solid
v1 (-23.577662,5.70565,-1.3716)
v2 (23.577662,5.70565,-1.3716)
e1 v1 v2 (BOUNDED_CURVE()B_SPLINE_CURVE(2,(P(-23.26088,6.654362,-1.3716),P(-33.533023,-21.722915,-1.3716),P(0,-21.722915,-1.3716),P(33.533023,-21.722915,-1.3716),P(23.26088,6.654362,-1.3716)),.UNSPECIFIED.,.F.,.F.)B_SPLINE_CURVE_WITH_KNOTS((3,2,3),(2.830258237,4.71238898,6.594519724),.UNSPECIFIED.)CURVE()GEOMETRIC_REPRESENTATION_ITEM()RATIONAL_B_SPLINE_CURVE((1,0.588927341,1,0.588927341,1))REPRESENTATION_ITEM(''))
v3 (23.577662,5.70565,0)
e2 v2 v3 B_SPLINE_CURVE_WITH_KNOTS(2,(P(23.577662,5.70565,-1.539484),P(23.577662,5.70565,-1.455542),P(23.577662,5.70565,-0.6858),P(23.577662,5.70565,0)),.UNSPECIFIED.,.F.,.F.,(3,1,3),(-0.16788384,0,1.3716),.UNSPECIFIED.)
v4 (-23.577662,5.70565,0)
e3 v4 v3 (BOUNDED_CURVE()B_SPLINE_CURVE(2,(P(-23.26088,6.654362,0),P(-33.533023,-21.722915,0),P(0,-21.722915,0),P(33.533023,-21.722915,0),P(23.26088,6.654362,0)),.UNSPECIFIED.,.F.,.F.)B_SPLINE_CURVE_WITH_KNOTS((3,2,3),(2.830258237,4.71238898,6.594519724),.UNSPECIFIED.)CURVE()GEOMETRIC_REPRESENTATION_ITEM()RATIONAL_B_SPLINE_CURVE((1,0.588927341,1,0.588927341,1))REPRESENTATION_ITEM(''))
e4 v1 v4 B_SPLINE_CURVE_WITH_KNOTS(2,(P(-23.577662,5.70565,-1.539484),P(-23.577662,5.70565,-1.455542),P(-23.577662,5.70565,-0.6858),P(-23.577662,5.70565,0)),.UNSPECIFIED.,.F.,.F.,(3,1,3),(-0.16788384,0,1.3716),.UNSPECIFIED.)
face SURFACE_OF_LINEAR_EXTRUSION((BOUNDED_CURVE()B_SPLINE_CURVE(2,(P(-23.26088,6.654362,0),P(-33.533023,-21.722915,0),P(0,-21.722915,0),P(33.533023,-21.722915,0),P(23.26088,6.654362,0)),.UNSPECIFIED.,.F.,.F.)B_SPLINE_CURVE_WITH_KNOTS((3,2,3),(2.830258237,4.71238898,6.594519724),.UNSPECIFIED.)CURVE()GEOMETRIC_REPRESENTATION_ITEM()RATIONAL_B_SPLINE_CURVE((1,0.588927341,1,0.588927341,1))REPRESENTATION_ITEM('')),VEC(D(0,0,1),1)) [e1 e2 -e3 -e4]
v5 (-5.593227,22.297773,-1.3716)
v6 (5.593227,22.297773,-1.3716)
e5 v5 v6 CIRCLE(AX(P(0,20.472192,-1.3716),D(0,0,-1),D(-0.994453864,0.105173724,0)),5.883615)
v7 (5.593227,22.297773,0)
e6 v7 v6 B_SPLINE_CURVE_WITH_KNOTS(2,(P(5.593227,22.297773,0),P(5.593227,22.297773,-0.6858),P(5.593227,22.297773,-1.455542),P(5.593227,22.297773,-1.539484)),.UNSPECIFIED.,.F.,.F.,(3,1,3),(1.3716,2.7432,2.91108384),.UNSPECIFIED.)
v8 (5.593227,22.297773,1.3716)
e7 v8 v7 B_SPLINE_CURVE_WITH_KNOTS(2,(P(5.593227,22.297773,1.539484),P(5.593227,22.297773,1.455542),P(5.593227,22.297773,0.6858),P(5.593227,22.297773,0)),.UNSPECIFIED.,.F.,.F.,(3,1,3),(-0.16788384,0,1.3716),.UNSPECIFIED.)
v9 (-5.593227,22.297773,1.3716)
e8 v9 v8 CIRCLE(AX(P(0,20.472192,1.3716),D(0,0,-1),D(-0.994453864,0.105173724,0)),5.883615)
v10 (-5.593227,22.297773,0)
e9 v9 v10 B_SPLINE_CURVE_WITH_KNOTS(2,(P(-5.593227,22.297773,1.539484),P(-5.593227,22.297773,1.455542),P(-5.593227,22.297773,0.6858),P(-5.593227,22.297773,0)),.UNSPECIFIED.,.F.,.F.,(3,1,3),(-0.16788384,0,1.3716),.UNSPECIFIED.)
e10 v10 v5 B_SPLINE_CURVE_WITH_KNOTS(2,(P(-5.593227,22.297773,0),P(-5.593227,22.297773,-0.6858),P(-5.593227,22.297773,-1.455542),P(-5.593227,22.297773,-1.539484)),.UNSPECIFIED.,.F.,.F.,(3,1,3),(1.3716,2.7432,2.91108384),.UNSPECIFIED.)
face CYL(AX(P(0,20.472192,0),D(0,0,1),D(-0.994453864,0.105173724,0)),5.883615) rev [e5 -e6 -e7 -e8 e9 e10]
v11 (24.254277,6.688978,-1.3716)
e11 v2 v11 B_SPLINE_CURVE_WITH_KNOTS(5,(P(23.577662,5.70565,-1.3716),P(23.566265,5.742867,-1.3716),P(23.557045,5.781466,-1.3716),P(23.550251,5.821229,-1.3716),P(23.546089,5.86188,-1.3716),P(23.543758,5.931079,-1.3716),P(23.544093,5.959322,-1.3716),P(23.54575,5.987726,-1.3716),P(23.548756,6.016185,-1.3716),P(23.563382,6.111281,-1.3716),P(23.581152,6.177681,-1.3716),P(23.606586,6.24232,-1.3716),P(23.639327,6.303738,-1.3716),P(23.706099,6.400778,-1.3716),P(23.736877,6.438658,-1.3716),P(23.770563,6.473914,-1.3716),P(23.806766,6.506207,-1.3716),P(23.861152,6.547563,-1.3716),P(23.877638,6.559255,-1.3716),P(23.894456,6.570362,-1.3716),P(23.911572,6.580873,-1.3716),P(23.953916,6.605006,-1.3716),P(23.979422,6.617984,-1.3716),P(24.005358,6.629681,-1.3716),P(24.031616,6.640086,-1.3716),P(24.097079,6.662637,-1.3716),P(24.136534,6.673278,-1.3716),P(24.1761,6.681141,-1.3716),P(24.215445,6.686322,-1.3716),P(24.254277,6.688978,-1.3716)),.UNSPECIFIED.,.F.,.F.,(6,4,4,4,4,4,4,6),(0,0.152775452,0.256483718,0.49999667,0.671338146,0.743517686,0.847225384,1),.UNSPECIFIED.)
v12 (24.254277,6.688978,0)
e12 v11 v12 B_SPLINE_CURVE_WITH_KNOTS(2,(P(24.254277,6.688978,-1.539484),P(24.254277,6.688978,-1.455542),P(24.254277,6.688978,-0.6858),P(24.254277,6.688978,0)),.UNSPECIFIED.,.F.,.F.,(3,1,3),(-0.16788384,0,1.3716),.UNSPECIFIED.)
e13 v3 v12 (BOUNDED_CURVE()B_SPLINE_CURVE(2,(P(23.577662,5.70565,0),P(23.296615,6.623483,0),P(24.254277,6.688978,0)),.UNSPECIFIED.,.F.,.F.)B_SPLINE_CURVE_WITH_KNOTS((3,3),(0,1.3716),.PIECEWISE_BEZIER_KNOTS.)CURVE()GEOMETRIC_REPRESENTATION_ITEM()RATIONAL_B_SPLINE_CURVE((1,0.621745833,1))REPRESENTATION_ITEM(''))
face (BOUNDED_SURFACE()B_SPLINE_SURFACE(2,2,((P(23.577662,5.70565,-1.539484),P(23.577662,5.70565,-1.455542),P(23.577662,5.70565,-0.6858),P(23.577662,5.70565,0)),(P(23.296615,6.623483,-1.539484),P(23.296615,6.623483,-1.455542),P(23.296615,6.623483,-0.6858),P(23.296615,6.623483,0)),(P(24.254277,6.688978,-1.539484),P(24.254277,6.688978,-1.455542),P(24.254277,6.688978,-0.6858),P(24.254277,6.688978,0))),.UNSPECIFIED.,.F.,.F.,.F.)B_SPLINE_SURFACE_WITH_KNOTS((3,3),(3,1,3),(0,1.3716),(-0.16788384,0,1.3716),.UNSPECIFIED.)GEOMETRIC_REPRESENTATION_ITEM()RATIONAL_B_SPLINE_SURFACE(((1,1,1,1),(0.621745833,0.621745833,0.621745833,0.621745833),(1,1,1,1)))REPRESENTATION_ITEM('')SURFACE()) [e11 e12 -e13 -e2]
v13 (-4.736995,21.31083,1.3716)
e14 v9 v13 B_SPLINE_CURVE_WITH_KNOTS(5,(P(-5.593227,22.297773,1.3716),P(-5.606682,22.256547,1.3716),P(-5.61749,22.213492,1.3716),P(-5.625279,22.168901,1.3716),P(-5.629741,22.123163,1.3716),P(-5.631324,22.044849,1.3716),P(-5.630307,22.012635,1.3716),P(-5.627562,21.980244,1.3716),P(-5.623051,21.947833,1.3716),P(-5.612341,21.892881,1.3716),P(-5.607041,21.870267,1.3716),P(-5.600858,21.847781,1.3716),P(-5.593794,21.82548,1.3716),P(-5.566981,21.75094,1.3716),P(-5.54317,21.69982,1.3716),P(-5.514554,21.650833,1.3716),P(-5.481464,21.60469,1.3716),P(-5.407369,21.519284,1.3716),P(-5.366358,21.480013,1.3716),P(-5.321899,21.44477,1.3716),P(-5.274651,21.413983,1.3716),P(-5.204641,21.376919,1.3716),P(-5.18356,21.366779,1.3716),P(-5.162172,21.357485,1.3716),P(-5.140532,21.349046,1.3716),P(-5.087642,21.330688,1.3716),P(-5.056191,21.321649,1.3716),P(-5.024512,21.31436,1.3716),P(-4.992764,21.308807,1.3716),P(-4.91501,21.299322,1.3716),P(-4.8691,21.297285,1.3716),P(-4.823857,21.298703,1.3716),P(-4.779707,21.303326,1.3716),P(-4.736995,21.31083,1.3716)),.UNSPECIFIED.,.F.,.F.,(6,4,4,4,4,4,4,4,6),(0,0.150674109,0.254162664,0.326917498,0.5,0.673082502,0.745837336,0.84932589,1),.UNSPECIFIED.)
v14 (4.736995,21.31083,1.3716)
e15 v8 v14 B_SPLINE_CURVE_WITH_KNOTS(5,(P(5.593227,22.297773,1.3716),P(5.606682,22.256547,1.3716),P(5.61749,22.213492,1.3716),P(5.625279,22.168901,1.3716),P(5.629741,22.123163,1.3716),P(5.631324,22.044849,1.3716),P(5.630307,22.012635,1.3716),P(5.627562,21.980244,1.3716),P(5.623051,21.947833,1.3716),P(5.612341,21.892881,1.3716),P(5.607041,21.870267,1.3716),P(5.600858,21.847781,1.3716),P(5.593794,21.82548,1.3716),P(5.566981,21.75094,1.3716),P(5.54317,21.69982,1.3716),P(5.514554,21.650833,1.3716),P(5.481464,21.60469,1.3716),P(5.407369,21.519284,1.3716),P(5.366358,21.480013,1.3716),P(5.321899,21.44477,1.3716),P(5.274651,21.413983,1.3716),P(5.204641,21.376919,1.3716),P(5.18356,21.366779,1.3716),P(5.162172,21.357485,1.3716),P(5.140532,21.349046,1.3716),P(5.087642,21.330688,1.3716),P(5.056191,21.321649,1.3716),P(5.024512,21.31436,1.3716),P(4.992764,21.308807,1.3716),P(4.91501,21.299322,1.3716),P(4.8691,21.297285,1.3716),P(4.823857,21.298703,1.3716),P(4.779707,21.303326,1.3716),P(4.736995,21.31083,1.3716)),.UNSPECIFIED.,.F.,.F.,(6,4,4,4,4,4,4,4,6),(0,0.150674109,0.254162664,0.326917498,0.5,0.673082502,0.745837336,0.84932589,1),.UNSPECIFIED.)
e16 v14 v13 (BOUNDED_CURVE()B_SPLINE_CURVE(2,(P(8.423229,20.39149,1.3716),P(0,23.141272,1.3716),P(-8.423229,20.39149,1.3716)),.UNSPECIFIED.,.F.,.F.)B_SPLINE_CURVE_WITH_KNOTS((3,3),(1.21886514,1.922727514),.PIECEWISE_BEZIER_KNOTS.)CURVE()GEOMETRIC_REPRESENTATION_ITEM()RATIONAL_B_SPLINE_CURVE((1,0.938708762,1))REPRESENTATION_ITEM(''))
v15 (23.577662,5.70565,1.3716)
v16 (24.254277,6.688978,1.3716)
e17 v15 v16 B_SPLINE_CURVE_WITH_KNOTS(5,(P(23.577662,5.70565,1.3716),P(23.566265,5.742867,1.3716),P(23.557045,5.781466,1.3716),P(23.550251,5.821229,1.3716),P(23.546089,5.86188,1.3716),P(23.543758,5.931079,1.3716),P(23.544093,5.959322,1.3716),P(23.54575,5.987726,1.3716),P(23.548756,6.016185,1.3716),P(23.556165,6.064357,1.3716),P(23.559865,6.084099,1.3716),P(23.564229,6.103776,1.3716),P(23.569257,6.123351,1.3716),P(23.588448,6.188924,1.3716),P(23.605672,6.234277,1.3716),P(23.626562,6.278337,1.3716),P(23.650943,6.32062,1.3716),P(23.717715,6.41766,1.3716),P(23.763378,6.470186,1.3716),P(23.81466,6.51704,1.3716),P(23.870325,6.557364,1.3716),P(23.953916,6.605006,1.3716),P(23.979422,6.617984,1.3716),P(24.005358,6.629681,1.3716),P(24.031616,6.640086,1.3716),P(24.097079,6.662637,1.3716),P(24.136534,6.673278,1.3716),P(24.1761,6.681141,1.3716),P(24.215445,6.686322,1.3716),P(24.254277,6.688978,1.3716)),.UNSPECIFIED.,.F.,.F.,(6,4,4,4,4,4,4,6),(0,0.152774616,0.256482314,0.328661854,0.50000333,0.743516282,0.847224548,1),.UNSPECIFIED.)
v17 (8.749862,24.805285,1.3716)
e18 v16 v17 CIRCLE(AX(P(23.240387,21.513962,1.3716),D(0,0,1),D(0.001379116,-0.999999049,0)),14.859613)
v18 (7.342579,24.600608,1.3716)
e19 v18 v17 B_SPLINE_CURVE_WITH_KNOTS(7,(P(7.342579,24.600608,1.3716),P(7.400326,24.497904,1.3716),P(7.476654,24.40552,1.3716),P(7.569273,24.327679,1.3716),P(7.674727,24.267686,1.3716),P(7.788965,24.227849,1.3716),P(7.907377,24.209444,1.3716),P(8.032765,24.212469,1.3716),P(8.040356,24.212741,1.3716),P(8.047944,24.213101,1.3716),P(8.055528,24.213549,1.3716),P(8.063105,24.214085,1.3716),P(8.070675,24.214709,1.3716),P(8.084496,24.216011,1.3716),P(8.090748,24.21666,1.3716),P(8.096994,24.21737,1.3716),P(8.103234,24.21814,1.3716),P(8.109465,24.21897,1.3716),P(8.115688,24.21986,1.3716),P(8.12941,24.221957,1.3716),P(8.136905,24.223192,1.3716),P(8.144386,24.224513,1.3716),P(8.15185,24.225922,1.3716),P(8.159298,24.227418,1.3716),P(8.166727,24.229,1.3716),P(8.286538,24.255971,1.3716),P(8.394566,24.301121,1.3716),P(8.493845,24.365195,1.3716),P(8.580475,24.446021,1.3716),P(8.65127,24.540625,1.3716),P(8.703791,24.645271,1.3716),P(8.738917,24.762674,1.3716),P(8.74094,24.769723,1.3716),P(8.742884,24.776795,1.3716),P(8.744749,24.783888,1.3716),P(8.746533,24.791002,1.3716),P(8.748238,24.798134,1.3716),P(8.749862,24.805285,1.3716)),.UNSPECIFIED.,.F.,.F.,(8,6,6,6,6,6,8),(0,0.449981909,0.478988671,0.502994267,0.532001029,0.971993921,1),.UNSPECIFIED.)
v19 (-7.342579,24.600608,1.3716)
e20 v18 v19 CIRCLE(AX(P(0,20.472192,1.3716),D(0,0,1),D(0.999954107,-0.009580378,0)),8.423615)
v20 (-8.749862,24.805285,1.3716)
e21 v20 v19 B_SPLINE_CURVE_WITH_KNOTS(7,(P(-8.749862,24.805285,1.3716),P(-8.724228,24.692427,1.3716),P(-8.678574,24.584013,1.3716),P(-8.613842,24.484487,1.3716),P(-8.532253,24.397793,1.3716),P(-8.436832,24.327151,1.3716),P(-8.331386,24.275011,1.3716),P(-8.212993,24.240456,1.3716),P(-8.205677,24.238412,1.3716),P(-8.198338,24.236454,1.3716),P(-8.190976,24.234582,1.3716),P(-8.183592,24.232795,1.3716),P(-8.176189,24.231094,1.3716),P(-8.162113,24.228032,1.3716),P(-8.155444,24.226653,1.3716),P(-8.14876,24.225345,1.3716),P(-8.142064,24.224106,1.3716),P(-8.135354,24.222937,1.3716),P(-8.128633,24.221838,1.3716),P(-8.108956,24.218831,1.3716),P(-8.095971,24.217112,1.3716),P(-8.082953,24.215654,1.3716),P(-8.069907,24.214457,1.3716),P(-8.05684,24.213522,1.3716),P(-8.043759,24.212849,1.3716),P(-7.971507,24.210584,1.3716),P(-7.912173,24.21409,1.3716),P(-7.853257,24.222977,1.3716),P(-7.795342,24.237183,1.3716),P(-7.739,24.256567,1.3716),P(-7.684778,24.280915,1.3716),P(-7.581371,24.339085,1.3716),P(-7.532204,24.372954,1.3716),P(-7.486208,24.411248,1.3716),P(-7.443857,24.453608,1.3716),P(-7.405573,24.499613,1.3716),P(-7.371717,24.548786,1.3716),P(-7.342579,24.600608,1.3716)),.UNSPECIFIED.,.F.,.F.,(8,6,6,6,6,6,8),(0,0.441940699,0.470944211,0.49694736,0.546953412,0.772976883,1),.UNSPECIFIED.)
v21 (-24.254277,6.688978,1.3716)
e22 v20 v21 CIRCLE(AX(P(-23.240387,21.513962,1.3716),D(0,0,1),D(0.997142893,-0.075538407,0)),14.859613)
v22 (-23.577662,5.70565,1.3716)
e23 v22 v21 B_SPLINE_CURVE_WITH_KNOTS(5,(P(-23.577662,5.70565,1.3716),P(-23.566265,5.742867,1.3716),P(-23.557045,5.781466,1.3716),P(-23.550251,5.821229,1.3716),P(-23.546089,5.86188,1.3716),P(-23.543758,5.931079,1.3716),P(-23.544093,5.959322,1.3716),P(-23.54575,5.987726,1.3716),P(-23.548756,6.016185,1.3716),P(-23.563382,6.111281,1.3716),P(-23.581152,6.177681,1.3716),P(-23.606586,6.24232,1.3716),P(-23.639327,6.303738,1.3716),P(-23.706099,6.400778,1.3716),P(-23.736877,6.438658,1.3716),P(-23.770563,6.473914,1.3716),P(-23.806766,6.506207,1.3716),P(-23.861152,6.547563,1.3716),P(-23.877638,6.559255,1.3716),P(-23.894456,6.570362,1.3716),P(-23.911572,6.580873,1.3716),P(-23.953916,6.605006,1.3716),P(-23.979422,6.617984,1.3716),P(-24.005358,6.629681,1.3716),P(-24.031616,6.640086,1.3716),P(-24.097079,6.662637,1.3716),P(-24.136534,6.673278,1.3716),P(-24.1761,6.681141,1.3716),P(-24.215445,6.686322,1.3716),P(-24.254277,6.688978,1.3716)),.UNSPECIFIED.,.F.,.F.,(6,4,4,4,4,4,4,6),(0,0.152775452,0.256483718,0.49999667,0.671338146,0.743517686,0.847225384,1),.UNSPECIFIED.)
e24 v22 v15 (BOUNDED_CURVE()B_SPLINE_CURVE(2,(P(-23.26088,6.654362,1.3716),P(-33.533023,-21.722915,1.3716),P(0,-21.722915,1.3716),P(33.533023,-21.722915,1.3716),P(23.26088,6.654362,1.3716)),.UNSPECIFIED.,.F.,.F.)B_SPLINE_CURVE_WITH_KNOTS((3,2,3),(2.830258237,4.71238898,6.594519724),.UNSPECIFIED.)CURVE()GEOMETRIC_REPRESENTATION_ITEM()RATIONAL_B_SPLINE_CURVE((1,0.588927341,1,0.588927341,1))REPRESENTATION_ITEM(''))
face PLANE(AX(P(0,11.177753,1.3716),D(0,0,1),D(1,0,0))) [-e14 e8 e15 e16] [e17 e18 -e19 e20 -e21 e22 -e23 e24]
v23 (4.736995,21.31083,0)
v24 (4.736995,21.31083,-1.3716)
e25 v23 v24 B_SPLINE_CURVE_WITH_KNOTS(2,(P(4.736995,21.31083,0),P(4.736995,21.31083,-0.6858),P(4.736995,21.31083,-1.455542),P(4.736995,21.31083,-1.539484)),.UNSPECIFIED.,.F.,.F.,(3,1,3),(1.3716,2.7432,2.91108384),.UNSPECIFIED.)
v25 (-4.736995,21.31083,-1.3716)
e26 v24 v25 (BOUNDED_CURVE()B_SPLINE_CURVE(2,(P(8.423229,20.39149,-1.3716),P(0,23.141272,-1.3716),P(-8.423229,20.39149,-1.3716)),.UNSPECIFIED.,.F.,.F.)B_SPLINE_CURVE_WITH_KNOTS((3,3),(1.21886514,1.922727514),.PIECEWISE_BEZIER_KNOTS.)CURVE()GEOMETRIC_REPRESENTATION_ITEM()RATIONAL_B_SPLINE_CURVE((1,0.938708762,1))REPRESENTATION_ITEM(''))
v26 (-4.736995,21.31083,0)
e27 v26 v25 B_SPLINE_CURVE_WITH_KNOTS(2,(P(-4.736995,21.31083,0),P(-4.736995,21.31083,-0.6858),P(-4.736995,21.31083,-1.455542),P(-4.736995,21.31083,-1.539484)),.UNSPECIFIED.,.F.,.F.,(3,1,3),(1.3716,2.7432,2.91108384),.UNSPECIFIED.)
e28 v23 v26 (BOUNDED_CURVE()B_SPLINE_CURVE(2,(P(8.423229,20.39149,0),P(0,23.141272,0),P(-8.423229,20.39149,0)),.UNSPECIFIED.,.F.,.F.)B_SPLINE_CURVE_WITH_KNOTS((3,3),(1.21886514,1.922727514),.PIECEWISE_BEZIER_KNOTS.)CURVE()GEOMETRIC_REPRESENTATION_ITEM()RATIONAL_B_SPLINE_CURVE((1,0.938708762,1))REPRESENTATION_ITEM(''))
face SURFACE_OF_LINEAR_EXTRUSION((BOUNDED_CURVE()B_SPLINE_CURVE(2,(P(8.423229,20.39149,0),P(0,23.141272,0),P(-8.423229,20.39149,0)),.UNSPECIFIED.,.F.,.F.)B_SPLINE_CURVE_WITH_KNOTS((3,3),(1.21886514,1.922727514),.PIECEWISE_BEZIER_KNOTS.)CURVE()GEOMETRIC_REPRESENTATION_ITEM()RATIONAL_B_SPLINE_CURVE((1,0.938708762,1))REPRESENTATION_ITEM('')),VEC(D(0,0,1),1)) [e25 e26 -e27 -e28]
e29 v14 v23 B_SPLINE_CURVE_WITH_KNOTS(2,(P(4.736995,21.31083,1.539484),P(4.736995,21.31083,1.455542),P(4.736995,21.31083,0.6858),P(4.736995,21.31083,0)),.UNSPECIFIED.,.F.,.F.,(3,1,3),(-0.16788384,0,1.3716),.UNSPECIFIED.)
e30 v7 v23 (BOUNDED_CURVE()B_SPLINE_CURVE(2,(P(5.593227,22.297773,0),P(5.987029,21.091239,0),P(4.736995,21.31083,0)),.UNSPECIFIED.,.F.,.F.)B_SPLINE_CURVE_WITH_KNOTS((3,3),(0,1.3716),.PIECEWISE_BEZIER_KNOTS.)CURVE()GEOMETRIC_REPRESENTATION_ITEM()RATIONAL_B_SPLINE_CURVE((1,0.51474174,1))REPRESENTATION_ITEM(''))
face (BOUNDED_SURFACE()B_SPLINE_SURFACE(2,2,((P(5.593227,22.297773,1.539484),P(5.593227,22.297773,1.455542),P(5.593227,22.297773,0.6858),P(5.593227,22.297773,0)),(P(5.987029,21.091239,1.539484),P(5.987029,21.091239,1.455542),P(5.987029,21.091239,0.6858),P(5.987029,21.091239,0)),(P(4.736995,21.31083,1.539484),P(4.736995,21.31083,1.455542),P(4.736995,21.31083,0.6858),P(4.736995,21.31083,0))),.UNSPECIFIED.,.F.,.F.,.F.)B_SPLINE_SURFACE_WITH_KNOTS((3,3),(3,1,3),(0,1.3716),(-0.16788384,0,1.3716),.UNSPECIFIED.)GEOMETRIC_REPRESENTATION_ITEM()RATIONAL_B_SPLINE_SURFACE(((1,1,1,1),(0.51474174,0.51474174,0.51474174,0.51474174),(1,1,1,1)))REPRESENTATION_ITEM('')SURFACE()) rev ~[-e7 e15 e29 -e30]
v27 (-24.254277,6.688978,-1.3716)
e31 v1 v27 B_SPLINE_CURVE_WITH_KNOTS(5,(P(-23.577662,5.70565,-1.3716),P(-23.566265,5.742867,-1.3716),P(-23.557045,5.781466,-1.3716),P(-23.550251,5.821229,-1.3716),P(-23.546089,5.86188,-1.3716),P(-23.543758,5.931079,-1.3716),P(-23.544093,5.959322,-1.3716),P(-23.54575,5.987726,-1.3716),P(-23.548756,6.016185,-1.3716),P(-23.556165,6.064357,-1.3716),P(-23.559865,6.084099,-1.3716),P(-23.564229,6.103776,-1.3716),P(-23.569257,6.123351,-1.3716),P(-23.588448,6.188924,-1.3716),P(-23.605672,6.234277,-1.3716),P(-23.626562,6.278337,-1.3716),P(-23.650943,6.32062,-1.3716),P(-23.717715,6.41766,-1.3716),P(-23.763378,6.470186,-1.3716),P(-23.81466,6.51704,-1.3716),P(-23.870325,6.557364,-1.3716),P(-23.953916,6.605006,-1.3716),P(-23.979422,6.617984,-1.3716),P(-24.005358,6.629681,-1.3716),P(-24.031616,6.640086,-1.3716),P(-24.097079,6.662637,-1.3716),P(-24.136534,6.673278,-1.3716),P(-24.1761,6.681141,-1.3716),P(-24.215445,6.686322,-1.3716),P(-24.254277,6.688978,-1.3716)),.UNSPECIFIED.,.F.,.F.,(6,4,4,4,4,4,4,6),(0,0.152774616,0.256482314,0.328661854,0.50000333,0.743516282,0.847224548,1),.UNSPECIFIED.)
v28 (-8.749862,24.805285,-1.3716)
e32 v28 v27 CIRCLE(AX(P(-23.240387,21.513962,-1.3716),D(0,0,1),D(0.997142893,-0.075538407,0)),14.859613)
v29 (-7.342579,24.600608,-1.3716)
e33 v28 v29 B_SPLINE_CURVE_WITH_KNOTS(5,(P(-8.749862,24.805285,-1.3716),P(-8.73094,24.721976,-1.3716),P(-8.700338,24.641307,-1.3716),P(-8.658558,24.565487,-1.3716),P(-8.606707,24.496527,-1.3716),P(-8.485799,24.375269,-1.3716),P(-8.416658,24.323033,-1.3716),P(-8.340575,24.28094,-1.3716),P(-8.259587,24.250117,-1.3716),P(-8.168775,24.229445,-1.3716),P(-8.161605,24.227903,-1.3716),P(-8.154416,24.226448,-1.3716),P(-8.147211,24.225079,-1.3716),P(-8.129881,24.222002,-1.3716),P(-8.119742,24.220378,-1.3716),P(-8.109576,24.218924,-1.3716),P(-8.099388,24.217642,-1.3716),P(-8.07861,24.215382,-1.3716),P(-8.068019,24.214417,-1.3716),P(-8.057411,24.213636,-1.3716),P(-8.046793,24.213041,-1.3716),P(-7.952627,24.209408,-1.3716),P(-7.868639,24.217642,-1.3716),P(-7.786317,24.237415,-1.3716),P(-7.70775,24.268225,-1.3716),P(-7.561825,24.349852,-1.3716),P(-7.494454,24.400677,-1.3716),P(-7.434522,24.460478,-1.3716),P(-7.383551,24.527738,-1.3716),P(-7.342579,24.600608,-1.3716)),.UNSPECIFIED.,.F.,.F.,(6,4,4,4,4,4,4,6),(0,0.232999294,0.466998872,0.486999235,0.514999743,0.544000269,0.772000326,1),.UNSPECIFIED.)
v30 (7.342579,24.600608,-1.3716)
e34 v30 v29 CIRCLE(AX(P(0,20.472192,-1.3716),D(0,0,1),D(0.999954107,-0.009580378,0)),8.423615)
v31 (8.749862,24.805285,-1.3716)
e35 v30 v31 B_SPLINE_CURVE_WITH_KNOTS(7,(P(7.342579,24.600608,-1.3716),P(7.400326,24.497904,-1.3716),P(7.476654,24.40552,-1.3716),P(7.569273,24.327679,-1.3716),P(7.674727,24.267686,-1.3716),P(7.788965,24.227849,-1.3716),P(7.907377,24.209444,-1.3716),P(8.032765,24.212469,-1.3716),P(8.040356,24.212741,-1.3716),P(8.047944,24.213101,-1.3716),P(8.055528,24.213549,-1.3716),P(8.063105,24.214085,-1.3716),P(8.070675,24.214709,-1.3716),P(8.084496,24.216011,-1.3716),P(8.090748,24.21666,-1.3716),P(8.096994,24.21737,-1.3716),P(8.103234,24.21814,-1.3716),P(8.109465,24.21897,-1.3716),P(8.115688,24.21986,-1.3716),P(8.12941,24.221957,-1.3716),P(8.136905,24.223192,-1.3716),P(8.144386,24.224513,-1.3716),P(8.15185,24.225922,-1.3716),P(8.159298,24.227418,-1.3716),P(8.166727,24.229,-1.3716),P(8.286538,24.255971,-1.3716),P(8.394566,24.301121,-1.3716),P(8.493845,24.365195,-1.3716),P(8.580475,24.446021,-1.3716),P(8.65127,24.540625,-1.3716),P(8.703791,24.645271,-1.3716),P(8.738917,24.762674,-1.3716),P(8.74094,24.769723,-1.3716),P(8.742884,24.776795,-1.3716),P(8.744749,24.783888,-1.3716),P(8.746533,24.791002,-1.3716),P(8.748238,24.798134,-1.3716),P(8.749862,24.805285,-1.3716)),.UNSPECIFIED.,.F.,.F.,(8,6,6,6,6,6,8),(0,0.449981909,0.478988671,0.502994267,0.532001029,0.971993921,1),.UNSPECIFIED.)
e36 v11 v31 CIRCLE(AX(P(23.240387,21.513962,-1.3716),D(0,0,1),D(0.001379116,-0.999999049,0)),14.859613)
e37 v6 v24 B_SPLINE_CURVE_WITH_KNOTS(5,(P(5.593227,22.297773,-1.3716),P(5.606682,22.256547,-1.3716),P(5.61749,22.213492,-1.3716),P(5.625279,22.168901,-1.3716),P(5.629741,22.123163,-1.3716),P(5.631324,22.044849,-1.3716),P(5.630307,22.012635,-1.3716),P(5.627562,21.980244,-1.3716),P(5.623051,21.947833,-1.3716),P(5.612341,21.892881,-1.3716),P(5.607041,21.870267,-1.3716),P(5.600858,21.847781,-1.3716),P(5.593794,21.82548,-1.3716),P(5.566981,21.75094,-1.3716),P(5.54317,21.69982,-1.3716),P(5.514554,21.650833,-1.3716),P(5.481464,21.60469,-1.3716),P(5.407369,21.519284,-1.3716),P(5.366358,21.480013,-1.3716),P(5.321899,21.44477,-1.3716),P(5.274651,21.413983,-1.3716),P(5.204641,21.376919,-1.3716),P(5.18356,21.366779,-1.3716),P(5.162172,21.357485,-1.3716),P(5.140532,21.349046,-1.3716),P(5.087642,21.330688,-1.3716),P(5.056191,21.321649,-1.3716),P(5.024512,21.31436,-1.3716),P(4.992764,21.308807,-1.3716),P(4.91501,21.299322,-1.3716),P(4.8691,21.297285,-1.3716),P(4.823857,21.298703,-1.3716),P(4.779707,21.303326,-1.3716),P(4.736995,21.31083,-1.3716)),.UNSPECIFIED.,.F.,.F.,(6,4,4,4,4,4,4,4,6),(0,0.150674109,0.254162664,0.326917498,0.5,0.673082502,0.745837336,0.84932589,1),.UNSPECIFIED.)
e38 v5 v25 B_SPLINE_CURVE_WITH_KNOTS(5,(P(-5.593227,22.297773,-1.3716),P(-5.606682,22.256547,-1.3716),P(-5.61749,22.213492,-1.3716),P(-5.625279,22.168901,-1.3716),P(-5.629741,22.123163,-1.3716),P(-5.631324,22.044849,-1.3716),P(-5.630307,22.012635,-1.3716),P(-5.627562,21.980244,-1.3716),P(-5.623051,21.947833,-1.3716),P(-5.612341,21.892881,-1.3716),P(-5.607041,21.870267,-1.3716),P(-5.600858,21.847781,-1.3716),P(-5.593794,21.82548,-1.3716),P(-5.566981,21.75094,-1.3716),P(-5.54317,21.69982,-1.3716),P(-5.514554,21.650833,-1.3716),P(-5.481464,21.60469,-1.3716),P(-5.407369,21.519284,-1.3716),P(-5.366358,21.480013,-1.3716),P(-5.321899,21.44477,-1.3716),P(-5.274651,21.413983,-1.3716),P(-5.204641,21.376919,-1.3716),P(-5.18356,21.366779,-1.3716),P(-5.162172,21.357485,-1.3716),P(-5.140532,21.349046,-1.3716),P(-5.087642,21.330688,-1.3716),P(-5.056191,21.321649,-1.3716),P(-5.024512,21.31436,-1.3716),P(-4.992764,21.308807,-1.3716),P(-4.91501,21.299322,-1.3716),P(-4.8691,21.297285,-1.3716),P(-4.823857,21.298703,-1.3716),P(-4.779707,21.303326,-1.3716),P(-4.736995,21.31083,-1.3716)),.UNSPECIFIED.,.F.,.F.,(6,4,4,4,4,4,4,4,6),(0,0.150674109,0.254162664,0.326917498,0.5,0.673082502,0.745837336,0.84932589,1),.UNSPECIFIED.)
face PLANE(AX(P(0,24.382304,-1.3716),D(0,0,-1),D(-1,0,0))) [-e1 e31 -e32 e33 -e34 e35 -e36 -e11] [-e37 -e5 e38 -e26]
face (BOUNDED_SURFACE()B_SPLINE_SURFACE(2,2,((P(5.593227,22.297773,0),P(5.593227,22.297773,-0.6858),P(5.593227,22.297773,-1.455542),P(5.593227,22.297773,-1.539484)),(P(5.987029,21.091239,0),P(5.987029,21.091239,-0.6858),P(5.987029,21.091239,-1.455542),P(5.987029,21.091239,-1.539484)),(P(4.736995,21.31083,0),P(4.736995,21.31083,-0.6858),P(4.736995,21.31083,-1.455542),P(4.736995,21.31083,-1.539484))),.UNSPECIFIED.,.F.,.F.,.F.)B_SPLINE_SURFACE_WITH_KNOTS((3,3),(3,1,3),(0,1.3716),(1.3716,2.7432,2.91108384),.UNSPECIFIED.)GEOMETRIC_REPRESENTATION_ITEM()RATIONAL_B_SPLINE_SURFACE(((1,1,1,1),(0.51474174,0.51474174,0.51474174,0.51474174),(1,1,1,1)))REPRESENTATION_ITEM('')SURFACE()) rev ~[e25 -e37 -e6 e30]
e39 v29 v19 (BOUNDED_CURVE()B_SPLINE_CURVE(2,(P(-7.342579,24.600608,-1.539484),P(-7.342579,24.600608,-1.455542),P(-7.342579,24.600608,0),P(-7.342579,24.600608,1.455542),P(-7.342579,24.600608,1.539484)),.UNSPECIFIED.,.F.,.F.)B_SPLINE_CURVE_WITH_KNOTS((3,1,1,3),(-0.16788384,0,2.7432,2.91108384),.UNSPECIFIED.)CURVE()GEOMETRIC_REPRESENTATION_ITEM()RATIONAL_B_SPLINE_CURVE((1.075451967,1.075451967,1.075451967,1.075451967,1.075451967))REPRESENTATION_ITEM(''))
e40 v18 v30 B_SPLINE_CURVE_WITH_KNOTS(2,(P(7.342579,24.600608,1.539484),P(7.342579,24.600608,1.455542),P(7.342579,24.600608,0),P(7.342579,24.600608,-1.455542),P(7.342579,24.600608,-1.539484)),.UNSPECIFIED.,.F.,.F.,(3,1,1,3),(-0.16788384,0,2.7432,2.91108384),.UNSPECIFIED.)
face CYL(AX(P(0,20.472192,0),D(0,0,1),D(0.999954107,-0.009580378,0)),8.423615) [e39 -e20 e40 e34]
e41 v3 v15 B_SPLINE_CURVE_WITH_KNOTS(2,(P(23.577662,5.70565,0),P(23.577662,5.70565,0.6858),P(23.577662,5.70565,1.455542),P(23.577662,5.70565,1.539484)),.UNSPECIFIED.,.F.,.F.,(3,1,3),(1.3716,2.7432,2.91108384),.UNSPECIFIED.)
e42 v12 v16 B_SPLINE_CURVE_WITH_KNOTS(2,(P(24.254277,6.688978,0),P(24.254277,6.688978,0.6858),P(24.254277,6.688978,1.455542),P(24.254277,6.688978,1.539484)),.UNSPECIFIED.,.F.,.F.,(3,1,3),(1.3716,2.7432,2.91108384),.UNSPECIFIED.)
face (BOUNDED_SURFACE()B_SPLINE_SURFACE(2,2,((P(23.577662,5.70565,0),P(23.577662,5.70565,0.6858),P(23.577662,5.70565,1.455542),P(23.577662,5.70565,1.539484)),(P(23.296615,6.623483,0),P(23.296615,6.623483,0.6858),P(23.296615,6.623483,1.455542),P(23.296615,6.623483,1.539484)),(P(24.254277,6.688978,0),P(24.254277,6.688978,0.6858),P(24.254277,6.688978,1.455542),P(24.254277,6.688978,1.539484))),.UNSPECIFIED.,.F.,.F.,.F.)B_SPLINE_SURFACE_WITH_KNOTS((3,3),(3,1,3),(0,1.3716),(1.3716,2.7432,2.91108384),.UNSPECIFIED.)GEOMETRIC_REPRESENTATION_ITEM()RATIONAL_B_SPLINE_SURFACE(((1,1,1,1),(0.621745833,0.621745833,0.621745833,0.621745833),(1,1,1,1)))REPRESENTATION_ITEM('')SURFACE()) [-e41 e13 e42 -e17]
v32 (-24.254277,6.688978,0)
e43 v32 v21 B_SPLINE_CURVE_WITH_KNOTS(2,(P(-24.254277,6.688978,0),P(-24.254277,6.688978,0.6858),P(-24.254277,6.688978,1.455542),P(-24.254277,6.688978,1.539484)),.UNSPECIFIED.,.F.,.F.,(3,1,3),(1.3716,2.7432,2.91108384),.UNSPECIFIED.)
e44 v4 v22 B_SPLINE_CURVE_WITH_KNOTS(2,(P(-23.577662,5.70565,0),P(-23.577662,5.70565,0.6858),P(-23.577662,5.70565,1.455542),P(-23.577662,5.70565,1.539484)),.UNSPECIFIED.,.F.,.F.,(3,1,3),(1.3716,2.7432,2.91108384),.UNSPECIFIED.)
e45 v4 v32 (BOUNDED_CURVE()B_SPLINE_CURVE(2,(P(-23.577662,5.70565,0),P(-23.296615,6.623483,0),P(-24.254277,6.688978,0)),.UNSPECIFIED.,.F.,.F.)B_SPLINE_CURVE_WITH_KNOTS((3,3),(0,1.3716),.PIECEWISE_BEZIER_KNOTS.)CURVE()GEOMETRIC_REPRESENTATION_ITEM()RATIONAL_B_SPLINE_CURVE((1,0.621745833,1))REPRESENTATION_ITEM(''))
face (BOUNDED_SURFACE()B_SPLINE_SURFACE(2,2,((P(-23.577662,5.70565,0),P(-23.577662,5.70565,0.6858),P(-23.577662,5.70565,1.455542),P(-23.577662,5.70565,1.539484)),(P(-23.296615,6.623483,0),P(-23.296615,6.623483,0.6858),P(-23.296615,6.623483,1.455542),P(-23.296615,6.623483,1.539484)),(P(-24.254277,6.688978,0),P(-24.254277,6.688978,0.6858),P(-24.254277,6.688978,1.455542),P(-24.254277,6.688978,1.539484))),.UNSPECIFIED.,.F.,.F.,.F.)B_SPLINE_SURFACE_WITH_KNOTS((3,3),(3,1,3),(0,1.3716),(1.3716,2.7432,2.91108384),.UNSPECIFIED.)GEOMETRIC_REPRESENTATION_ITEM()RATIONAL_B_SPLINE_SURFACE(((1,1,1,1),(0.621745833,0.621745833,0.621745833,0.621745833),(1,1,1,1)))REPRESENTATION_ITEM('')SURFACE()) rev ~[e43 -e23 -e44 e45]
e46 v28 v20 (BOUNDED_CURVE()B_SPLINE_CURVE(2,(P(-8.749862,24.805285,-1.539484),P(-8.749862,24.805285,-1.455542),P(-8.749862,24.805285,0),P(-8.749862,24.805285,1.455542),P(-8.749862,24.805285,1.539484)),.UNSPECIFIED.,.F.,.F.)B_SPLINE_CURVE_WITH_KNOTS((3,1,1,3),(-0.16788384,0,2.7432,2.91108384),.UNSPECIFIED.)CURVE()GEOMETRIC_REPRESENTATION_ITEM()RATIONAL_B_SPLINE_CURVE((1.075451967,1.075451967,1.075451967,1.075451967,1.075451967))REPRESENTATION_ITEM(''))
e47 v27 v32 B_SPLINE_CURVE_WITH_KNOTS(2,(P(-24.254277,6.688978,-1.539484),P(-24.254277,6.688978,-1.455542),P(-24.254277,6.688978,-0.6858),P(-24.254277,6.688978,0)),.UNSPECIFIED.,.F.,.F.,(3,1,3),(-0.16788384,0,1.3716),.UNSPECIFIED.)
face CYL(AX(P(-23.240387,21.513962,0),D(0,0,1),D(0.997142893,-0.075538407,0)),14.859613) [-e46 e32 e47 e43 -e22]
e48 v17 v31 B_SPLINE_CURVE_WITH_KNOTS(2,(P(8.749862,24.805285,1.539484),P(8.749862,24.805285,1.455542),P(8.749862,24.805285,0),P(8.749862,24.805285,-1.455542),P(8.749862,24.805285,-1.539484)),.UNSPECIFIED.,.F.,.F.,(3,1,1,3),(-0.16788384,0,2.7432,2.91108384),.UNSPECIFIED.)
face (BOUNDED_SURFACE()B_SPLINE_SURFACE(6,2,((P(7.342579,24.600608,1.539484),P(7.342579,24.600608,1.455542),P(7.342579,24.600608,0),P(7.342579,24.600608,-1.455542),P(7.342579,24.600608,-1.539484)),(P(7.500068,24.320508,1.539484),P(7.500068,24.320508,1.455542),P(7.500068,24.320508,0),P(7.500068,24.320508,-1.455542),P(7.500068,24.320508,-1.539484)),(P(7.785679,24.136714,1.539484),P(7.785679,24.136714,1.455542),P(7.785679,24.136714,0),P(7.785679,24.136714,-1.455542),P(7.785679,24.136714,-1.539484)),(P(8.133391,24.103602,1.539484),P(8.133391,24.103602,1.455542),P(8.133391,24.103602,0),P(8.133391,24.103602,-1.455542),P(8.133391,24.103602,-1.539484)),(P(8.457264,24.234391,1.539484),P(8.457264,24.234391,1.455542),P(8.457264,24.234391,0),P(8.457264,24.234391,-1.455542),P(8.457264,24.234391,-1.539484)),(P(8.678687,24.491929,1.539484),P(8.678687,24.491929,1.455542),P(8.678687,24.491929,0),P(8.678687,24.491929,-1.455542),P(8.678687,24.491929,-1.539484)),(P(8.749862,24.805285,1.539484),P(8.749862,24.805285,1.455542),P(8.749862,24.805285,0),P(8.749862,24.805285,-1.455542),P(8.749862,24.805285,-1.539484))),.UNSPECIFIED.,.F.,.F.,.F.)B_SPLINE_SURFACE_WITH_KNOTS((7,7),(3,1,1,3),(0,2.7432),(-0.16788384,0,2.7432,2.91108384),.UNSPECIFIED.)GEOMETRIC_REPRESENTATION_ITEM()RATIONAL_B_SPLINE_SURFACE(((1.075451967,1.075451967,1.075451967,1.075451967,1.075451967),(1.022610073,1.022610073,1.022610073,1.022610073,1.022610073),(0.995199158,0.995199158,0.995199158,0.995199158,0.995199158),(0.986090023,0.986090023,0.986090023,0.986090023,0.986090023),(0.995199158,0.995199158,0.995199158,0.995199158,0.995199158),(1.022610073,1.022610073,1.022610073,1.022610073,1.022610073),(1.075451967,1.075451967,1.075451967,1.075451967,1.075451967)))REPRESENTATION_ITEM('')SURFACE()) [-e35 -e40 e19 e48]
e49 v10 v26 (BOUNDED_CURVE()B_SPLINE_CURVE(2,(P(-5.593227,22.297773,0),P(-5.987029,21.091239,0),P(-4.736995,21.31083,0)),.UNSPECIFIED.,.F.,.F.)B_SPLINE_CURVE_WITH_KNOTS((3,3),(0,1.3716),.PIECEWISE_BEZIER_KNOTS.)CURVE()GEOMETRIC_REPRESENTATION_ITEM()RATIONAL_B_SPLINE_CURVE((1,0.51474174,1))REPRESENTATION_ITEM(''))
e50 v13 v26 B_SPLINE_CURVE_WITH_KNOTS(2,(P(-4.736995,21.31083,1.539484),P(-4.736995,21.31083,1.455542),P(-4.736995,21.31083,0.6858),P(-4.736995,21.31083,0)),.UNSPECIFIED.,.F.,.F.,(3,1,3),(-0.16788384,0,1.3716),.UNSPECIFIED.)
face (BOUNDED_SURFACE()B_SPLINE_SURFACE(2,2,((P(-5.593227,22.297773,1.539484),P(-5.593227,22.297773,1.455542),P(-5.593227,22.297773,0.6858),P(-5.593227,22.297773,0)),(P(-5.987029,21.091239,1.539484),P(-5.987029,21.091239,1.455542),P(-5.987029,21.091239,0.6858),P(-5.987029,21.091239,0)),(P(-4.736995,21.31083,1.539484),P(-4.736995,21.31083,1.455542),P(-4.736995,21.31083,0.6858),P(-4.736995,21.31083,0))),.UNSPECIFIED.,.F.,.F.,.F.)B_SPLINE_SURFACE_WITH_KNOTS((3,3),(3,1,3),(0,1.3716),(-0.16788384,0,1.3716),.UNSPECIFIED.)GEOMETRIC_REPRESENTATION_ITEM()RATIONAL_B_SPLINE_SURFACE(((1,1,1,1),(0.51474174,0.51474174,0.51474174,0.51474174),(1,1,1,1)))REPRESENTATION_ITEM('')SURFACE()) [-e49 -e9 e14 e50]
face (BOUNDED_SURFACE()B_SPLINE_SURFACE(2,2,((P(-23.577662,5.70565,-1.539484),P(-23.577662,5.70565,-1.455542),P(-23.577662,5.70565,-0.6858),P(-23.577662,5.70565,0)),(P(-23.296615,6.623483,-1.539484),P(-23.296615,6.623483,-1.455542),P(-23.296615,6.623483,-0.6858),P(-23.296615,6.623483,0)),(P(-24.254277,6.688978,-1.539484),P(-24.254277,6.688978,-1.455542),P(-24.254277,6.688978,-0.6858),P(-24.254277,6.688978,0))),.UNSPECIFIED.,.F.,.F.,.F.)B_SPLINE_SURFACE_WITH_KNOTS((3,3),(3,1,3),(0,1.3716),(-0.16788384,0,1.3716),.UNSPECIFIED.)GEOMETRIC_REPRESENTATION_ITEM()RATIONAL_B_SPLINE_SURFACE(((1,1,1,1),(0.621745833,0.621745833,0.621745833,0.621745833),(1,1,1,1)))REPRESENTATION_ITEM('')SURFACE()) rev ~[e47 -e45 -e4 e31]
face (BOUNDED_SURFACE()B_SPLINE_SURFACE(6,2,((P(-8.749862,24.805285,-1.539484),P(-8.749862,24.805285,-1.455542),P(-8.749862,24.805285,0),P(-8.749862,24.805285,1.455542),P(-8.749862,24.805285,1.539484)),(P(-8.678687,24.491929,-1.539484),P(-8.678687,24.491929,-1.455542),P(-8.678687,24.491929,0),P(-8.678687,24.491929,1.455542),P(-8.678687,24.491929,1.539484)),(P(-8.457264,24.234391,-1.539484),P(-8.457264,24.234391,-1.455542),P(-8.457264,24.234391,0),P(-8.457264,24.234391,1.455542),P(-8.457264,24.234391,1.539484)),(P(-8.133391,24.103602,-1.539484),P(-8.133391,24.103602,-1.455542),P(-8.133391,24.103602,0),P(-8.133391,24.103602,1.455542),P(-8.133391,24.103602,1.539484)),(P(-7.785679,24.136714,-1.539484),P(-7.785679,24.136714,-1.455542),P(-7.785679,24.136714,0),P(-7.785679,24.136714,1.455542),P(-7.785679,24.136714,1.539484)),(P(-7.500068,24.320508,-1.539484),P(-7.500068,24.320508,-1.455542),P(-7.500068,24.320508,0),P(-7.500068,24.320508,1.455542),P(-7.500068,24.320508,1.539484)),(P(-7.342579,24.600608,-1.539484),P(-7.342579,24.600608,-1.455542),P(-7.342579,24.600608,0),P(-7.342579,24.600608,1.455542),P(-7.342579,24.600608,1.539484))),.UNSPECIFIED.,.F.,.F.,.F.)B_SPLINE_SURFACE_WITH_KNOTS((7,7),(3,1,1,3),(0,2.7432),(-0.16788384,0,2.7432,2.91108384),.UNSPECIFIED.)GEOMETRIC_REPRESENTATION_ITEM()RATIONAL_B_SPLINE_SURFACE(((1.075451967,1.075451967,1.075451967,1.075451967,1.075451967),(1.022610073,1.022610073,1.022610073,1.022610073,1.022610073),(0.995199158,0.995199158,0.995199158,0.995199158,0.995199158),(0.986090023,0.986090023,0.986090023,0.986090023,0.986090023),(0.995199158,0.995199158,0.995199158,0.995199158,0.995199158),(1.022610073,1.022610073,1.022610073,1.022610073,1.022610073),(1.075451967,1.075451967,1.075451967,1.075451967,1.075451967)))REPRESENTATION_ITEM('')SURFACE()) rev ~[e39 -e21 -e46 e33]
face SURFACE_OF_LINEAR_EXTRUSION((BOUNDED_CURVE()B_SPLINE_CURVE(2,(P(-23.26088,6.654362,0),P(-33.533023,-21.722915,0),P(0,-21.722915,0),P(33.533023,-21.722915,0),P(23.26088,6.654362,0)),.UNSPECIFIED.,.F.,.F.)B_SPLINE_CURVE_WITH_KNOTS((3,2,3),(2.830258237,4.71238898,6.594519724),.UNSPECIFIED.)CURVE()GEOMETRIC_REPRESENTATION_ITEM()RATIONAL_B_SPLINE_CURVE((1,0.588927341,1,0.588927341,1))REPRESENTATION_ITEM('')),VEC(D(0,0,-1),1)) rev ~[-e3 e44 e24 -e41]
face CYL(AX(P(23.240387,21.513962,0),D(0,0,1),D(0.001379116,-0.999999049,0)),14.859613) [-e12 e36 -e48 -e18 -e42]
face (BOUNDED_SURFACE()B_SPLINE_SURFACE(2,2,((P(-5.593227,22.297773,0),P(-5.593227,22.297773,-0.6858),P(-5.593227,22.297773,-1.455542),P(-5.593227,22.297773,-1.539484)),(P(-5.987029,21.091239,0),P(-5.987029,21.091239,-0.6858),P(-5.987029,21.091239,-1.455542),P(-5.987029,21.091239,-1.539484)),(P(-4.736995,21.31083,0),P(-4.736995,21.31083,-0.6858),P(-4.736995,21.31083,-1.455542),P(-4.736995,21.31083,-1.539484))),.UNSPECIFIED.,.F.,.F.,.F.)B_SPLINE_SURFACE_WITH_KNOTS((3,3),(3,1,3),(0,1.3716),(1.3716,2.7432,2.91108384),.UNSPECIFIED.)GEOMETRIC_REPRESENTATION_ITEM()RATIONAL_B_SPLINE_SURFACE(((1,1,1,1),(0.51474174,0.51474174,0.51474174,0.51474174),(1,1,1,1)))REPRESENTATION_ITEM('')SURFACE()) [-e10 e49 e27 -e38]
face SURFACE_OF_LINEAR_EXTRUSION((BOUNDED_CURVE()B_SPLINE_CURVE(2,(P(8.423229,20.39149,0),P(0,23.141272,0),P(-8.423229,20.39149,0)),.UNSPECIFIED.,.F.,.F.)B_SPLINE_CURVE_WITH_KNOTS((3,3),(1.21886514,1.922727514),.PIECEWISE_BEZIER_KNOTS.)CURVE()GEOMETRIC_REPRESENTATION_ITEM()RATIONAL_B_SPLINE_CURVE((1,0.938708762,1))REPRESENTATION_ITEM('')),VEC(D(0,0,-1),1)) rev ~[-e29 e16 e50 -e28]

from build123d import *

# Parameters (mm, degrees)
F1_DEPTH      = 1.3716
F3_DEPTH      = 1.3716
F3_DEPTH_BACK = 1.3716
F4_R          = 0.762


# Not quite as in the source:
# - a feature names something its author has since deleted; it is built from what else it names


with BuildPart() as f1:
    # F0 (on Top) → F1 (new body, symmetric)
    with BuildSketch(Plane.XY):
        with BuildLine():
            ThreePointArc((-8.4232286975, 20.3914902339), (-33.3355583029, 32.417888511), (-23.260879727, 6.6543624814))
            add(Edge.make_bspline(
                [(-23.260879727, 6.6543624814), (-33.5330229603, -21.7229145667), (0, -21.7229145667), (33.5330229603, -21.7229145667), (23.260879727, 6.6543624814)],
                knots=[2.8302582369, 2.8302582369, 2.8302582369, 4.7123889804, 4.7123889804, 6.5945197238, 6.5945197238, 6.5945197238], degree=2, weights=[1, 0.5889273409, 1, 0.5889273409, 1]))
            ThreePointArc((23.260879727, 6.6543624814), (33.3355583029, 32.417888511), (8.4232286975, 20.3914902339))
            add(Edge.make_bspline(
                [(8.4232286975, 20.3914902339), (0, 23.1412717688), (-8.4232286975, 20.3914902339)],
                knots=[1.2188651396, 1.2188651396, 1.2188651396, 1.922727514, 1.922727514, 1.922727514], degree=2, weights=[1, 0.9387087617, 1]))
        make_face()
    extrude(amount=F1_DEPTH, both=True)

    # F2 (on Top) → F3 (join, two sides)
    with BuildSketch(Plane.XY) as f3_sk:
        with BuildLine():
            add(Edge.make_bspline(
                [(8.4232286975, 20.3914902339), (7.1587937107, 20.8042678164), (5.8509839512, 21.0909933818)],
                knots=[1.2188651396, 1.2188651396, 1.2188651396, 1.3290021299, 1.3290021299, 1.3290021299], degree=2, weights=[1, 0.9984841136, 1]))
            ThreePointArc((8.4232286975, 20.3914902339), (0, 28.8958069319), (-8.4232286975, 20.3914902339))
            add(Edge.make_bspline(
                [(-5.8509839512, 21.0909933818), (-7.1587937107, 20.8042678164), (-8.4232286975, 20.3914902339)],
                knots=[1.8125905237, 1.8125905237, 1.8125905237, 1.922727514, 1.922727514, 1.922727514], degree=2, weights=[1, 0.9984841136, 1]))
            ThreePointArc((-5.8509839512, 21.0909933818), (0, 26.3558069319), (5.8509839512, 21.0909933818))
        make_face()
    extrude(amount=F3_DEPTH)
    extrude(f3_sk.sketch, amount=-F3_DEPTH_BACK)

    # F4
    f4_edges = [f1.edges().sort_by_distance(p)[0] for p in [
        (5.850984, 21.090993, -0.6858),
        (-5.850984, 21.090993, -0.6858),
        (23.26088, 6.654362, 0.6858),
        (23.26088, 6.654362, -0.6858),
        (-23.26088, 6.654362, 0.6858),
        (-23.26088, 6.654362, -0.6858),
        (8.382226, 21.306212, 0),
        (-8.382226, 21.306212, 0),
        (-5.850984, 21.090993, 0.6858),
        (5.850984, 21.090993, 0.6858),
    ]]
    fillet(f4_edges, radius=F4_R)


solid = f1.part
